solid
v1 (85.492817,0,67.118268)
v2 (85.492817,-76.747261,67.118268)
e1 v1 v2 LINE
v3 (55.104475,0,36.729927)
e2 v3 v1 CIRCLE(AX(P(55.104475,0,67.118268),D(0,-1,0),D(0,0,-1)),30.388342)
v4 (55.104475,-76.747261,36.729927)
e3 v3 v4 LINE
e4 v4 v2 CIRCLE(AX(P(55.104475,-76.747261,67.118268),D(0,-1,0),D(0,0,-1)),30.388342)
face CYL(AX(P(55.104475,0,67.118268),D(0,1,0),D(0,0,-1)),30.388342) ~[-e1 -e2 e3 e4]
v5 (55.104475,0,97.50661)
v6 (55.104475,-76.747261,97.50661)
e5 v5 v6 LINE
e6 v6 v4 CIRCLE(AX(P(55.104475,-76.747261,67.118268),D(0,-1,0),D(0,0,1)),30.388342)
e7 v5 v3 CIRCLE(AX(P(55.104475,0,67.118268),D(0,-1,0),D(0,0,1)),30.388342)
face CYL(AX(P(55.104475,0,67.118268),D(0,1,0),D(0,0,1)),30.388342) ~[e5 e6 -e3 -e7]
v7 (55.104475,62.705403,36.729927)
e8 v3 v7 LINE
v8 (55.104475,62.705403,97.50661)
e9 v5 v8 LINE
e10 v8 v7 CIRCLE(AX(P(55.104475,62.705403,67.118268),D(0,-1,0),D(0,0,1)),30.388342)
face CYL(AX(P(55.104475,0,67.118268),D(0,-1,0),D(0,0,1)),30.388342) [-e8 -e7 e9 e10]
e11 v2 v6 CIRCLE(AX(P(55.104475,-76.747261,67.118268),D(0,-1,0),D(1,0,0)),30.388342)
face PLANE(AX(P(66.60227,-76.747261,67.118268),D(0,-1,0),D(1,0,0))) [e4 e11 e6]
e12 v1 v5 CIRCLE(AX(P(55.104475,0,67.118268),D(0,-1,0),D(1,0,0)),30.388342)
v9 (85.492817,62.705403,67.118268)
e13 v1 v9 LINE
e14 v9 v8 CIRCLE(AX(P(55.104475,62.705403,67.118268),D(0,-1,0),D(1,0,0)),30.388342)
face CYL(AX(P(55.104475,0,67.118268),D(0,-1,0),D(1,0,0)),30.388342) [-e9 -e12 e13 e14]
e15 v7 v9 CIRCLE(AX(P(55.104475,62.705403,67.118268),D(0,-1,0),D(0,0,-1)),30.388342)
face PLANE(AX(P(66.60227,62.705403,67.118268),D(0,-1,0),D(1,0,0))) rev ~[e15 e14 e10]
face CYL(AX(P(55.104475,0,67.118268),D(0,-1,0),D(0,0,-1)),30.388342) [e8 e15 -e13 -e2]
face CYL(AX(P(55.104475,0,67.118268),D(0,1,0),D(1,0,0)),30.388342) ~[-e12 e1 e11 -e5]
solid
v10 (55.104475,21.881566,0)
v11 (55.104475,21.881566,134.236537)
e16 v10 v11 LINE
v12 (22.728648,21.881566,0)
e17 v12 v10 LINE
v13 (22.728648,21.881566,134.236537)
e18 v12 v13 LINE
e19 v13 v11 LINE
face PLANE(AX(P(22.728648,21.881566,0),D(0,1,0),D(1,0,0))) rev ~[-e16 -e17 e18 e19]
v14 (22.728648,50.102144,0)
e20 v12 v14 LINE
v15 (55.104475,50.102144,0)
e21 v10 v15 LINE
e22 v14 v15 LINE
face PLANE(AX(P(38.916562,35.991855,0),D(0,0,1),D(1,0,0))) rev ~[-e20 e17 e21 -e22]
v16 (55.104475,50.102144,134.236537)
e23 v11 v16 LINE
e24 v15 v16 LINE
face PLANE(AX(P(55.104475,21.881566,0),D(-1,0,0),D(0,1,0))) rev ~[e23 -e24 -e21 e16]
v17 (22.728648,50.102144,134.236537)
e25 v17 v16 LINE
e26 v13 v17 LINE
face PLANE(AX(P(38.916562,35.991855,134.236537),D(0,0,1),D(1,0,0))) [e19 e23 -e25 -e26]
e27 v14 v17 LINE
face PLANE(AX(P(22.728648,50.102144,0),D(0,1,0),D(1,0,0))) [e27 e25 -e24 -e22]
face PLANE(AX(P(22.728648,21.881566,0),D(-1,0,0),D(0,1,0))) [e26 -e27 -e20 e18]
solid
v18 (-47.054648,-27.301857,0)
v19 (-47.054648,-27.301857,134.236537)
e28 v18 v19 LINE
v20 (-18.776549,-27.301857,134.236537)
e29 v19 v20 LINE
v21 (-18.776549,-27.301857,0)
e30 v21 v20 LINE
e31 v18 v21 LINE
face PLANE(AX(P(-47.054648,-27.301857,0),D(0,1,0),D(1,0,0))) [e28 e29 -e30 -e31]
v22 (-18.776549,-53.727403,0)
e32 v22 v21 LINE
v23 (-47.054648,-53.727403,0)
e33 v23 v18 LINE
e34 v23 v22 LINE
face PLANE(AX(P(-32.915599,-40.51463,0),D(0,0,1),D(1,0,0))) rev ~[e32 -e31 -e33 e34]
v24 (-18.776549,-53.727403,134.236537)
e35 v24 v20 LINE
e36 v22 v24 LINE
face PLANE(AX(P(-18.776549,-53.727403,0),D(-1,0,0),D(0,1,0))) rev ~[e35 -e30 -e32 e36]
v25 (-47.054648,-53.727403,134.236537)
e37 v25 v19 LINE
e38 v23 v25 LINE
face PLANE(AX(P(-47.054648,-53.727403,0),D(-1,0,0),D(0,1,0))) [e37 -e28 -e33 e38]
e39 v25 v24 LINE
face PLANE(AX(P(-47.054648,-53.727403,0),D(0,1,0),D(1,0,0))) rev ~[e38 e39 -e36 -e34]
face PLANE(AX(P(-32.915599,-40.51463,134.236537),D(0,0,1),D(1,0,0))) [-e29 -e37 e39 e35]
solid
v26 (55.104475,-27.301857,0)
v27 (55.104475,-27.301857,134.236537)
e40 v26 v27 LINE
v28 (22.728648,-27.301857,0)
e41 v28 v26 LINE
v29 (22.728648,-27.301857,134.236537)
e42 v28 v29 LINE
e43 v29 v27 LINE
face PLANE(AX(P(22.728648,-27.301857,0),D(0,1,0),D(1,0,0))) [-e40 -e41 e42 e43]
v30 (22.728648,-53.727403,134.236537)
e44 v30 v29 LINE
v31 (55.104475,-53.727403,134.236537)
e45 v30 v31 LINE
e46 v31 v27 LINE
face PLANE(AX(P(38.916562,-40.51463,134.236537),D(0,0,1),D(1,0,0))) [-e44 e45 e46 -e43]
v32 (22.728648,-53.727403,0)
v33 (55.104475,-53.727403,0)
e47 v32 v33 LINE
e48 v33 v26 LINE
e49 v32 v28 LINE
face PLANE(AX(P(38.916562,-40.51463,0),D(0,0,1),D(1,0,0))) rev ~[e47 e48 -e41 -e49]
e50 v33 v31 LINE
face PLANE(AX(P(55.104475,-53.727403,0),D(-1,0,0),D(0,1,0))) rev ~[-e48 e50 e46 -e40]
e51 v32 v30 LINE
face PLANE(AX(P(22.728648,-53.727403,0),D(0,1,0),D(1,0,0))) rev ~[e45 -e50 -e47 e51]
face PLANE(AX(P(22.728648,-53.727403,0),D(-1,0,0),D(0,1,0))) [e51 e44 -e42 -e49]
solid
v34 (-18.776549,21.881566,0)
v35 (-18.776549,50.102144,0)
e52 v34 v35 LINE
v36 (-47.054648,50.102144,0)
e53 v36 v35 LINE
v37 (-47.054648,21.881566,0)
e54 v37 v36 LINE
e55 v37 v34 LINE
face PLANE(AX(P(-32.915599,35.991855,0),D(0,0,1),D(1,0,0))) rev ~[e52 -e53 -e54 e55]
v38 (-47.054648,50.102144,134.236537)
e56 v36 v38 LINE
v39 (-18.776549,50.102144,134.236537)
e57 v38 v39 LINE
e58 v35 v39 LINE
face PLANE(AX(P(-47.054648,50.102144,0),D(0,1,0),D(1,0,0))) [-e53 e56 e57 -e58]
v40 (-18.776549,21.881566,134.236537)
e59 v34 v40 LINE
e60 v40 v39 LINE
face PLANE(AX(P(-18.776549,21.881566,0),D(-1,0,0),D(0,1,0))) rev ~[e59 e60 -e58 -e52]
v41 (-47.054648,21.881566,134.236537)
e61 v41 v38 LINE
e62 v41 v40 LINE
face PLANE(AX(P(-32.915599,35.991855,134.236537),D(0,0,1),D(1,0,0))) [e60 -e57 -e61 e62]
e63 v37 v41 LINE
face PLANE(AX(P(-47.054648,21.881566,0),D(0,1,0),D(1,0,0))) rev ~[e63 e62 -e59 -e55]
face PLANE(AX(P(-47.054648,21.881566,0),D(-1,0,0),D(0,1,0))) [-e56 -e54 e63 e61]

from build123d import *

# Parameters (mm, degrees)
F0_W          = 28.278099373
F0_H          = 28.2205780968
F1_DEPTH      = 134.2365369201
F0_W_2        = 32.3758274317
F0_H_2        = 26.4255460352
F3_DEPTH      = 62.7054031938
F3_DEPTH_BACK = 76.7472609878


with BuildPart() as f1:
    # F0 (on Top) → F1 (new body)
    with BuildSketch(Plane.XY):
        with Locations((-32.9155987129, 35.9918554313)):
            Rectangle(F0_W, F0_H)
    extrude(amount=F1_DEPTH)


with BuildPart() as f1b:
    # F0 (on Top) → F1, piece 2 (new body)
    with BuildSketch(Plane.XY):
        with Locations((38.9165617526, 35.9918554313)):
            Rectangle(F0_W_2, F0_H)
    extrude(amount=F1_DEPTH)


with BuildPart() as f1c:
    # F0 (on Top) → F1, piece 3 (new body)
    with BuildSketch(Plane.XY):
        with Locations((38.9165617526, -40.5146302655)):
            Rectangle(F0_W_2, F0_H_2)
    extrude(amount=F1_DEPTH)


with BuildPart() as f1d:
    # F0 (on Top) → F1, piece 4 (new body)
    with BuildSketch(Plane.XY):
        with Locations((-32.9155987129, -40.5146302655)):
            Rectangle(F0_W, F0_H_2)
    extrude(amount=F1_DEPTH)


with BuildPart() as f3:
    # F2 (on Front) → F3 (new body, two sides)
    with BuildSketch(Plane.XZ) as f3_sk:
        with BuildLine():
            ThreePointArc((85.4928173756, 67.11826846), (76.5922781, 88.6060710916), (55.1044754684, 97.5066103673))
            Line((55.1044754684, 97.5066103673), (55.1044754684, 36.7299265528))
            ThreePointArc((55.1044754684, 36.7299265528), (76.5922781, 45.6304658284), (85.4928173756, 67.11826846))
        make_face()
        with BuildLine():
            Line((55.1044754684, 36.7299265528), (55.1044754684, 97.5066103673))
            ThreePointArc((55.1044754684, 97.5066103673), (24.7161335612, 67.11826846), (55.1044754684, 36.7299265528))
        make_face()
    extrude(amount=-F3_DEPTH)
    extrude(f3_sk.sketch, amount=F3_DEPTH_BACK)


solid = Compound([f1.part, f1b.part, f1c.part, f1d.part, f3.part])
